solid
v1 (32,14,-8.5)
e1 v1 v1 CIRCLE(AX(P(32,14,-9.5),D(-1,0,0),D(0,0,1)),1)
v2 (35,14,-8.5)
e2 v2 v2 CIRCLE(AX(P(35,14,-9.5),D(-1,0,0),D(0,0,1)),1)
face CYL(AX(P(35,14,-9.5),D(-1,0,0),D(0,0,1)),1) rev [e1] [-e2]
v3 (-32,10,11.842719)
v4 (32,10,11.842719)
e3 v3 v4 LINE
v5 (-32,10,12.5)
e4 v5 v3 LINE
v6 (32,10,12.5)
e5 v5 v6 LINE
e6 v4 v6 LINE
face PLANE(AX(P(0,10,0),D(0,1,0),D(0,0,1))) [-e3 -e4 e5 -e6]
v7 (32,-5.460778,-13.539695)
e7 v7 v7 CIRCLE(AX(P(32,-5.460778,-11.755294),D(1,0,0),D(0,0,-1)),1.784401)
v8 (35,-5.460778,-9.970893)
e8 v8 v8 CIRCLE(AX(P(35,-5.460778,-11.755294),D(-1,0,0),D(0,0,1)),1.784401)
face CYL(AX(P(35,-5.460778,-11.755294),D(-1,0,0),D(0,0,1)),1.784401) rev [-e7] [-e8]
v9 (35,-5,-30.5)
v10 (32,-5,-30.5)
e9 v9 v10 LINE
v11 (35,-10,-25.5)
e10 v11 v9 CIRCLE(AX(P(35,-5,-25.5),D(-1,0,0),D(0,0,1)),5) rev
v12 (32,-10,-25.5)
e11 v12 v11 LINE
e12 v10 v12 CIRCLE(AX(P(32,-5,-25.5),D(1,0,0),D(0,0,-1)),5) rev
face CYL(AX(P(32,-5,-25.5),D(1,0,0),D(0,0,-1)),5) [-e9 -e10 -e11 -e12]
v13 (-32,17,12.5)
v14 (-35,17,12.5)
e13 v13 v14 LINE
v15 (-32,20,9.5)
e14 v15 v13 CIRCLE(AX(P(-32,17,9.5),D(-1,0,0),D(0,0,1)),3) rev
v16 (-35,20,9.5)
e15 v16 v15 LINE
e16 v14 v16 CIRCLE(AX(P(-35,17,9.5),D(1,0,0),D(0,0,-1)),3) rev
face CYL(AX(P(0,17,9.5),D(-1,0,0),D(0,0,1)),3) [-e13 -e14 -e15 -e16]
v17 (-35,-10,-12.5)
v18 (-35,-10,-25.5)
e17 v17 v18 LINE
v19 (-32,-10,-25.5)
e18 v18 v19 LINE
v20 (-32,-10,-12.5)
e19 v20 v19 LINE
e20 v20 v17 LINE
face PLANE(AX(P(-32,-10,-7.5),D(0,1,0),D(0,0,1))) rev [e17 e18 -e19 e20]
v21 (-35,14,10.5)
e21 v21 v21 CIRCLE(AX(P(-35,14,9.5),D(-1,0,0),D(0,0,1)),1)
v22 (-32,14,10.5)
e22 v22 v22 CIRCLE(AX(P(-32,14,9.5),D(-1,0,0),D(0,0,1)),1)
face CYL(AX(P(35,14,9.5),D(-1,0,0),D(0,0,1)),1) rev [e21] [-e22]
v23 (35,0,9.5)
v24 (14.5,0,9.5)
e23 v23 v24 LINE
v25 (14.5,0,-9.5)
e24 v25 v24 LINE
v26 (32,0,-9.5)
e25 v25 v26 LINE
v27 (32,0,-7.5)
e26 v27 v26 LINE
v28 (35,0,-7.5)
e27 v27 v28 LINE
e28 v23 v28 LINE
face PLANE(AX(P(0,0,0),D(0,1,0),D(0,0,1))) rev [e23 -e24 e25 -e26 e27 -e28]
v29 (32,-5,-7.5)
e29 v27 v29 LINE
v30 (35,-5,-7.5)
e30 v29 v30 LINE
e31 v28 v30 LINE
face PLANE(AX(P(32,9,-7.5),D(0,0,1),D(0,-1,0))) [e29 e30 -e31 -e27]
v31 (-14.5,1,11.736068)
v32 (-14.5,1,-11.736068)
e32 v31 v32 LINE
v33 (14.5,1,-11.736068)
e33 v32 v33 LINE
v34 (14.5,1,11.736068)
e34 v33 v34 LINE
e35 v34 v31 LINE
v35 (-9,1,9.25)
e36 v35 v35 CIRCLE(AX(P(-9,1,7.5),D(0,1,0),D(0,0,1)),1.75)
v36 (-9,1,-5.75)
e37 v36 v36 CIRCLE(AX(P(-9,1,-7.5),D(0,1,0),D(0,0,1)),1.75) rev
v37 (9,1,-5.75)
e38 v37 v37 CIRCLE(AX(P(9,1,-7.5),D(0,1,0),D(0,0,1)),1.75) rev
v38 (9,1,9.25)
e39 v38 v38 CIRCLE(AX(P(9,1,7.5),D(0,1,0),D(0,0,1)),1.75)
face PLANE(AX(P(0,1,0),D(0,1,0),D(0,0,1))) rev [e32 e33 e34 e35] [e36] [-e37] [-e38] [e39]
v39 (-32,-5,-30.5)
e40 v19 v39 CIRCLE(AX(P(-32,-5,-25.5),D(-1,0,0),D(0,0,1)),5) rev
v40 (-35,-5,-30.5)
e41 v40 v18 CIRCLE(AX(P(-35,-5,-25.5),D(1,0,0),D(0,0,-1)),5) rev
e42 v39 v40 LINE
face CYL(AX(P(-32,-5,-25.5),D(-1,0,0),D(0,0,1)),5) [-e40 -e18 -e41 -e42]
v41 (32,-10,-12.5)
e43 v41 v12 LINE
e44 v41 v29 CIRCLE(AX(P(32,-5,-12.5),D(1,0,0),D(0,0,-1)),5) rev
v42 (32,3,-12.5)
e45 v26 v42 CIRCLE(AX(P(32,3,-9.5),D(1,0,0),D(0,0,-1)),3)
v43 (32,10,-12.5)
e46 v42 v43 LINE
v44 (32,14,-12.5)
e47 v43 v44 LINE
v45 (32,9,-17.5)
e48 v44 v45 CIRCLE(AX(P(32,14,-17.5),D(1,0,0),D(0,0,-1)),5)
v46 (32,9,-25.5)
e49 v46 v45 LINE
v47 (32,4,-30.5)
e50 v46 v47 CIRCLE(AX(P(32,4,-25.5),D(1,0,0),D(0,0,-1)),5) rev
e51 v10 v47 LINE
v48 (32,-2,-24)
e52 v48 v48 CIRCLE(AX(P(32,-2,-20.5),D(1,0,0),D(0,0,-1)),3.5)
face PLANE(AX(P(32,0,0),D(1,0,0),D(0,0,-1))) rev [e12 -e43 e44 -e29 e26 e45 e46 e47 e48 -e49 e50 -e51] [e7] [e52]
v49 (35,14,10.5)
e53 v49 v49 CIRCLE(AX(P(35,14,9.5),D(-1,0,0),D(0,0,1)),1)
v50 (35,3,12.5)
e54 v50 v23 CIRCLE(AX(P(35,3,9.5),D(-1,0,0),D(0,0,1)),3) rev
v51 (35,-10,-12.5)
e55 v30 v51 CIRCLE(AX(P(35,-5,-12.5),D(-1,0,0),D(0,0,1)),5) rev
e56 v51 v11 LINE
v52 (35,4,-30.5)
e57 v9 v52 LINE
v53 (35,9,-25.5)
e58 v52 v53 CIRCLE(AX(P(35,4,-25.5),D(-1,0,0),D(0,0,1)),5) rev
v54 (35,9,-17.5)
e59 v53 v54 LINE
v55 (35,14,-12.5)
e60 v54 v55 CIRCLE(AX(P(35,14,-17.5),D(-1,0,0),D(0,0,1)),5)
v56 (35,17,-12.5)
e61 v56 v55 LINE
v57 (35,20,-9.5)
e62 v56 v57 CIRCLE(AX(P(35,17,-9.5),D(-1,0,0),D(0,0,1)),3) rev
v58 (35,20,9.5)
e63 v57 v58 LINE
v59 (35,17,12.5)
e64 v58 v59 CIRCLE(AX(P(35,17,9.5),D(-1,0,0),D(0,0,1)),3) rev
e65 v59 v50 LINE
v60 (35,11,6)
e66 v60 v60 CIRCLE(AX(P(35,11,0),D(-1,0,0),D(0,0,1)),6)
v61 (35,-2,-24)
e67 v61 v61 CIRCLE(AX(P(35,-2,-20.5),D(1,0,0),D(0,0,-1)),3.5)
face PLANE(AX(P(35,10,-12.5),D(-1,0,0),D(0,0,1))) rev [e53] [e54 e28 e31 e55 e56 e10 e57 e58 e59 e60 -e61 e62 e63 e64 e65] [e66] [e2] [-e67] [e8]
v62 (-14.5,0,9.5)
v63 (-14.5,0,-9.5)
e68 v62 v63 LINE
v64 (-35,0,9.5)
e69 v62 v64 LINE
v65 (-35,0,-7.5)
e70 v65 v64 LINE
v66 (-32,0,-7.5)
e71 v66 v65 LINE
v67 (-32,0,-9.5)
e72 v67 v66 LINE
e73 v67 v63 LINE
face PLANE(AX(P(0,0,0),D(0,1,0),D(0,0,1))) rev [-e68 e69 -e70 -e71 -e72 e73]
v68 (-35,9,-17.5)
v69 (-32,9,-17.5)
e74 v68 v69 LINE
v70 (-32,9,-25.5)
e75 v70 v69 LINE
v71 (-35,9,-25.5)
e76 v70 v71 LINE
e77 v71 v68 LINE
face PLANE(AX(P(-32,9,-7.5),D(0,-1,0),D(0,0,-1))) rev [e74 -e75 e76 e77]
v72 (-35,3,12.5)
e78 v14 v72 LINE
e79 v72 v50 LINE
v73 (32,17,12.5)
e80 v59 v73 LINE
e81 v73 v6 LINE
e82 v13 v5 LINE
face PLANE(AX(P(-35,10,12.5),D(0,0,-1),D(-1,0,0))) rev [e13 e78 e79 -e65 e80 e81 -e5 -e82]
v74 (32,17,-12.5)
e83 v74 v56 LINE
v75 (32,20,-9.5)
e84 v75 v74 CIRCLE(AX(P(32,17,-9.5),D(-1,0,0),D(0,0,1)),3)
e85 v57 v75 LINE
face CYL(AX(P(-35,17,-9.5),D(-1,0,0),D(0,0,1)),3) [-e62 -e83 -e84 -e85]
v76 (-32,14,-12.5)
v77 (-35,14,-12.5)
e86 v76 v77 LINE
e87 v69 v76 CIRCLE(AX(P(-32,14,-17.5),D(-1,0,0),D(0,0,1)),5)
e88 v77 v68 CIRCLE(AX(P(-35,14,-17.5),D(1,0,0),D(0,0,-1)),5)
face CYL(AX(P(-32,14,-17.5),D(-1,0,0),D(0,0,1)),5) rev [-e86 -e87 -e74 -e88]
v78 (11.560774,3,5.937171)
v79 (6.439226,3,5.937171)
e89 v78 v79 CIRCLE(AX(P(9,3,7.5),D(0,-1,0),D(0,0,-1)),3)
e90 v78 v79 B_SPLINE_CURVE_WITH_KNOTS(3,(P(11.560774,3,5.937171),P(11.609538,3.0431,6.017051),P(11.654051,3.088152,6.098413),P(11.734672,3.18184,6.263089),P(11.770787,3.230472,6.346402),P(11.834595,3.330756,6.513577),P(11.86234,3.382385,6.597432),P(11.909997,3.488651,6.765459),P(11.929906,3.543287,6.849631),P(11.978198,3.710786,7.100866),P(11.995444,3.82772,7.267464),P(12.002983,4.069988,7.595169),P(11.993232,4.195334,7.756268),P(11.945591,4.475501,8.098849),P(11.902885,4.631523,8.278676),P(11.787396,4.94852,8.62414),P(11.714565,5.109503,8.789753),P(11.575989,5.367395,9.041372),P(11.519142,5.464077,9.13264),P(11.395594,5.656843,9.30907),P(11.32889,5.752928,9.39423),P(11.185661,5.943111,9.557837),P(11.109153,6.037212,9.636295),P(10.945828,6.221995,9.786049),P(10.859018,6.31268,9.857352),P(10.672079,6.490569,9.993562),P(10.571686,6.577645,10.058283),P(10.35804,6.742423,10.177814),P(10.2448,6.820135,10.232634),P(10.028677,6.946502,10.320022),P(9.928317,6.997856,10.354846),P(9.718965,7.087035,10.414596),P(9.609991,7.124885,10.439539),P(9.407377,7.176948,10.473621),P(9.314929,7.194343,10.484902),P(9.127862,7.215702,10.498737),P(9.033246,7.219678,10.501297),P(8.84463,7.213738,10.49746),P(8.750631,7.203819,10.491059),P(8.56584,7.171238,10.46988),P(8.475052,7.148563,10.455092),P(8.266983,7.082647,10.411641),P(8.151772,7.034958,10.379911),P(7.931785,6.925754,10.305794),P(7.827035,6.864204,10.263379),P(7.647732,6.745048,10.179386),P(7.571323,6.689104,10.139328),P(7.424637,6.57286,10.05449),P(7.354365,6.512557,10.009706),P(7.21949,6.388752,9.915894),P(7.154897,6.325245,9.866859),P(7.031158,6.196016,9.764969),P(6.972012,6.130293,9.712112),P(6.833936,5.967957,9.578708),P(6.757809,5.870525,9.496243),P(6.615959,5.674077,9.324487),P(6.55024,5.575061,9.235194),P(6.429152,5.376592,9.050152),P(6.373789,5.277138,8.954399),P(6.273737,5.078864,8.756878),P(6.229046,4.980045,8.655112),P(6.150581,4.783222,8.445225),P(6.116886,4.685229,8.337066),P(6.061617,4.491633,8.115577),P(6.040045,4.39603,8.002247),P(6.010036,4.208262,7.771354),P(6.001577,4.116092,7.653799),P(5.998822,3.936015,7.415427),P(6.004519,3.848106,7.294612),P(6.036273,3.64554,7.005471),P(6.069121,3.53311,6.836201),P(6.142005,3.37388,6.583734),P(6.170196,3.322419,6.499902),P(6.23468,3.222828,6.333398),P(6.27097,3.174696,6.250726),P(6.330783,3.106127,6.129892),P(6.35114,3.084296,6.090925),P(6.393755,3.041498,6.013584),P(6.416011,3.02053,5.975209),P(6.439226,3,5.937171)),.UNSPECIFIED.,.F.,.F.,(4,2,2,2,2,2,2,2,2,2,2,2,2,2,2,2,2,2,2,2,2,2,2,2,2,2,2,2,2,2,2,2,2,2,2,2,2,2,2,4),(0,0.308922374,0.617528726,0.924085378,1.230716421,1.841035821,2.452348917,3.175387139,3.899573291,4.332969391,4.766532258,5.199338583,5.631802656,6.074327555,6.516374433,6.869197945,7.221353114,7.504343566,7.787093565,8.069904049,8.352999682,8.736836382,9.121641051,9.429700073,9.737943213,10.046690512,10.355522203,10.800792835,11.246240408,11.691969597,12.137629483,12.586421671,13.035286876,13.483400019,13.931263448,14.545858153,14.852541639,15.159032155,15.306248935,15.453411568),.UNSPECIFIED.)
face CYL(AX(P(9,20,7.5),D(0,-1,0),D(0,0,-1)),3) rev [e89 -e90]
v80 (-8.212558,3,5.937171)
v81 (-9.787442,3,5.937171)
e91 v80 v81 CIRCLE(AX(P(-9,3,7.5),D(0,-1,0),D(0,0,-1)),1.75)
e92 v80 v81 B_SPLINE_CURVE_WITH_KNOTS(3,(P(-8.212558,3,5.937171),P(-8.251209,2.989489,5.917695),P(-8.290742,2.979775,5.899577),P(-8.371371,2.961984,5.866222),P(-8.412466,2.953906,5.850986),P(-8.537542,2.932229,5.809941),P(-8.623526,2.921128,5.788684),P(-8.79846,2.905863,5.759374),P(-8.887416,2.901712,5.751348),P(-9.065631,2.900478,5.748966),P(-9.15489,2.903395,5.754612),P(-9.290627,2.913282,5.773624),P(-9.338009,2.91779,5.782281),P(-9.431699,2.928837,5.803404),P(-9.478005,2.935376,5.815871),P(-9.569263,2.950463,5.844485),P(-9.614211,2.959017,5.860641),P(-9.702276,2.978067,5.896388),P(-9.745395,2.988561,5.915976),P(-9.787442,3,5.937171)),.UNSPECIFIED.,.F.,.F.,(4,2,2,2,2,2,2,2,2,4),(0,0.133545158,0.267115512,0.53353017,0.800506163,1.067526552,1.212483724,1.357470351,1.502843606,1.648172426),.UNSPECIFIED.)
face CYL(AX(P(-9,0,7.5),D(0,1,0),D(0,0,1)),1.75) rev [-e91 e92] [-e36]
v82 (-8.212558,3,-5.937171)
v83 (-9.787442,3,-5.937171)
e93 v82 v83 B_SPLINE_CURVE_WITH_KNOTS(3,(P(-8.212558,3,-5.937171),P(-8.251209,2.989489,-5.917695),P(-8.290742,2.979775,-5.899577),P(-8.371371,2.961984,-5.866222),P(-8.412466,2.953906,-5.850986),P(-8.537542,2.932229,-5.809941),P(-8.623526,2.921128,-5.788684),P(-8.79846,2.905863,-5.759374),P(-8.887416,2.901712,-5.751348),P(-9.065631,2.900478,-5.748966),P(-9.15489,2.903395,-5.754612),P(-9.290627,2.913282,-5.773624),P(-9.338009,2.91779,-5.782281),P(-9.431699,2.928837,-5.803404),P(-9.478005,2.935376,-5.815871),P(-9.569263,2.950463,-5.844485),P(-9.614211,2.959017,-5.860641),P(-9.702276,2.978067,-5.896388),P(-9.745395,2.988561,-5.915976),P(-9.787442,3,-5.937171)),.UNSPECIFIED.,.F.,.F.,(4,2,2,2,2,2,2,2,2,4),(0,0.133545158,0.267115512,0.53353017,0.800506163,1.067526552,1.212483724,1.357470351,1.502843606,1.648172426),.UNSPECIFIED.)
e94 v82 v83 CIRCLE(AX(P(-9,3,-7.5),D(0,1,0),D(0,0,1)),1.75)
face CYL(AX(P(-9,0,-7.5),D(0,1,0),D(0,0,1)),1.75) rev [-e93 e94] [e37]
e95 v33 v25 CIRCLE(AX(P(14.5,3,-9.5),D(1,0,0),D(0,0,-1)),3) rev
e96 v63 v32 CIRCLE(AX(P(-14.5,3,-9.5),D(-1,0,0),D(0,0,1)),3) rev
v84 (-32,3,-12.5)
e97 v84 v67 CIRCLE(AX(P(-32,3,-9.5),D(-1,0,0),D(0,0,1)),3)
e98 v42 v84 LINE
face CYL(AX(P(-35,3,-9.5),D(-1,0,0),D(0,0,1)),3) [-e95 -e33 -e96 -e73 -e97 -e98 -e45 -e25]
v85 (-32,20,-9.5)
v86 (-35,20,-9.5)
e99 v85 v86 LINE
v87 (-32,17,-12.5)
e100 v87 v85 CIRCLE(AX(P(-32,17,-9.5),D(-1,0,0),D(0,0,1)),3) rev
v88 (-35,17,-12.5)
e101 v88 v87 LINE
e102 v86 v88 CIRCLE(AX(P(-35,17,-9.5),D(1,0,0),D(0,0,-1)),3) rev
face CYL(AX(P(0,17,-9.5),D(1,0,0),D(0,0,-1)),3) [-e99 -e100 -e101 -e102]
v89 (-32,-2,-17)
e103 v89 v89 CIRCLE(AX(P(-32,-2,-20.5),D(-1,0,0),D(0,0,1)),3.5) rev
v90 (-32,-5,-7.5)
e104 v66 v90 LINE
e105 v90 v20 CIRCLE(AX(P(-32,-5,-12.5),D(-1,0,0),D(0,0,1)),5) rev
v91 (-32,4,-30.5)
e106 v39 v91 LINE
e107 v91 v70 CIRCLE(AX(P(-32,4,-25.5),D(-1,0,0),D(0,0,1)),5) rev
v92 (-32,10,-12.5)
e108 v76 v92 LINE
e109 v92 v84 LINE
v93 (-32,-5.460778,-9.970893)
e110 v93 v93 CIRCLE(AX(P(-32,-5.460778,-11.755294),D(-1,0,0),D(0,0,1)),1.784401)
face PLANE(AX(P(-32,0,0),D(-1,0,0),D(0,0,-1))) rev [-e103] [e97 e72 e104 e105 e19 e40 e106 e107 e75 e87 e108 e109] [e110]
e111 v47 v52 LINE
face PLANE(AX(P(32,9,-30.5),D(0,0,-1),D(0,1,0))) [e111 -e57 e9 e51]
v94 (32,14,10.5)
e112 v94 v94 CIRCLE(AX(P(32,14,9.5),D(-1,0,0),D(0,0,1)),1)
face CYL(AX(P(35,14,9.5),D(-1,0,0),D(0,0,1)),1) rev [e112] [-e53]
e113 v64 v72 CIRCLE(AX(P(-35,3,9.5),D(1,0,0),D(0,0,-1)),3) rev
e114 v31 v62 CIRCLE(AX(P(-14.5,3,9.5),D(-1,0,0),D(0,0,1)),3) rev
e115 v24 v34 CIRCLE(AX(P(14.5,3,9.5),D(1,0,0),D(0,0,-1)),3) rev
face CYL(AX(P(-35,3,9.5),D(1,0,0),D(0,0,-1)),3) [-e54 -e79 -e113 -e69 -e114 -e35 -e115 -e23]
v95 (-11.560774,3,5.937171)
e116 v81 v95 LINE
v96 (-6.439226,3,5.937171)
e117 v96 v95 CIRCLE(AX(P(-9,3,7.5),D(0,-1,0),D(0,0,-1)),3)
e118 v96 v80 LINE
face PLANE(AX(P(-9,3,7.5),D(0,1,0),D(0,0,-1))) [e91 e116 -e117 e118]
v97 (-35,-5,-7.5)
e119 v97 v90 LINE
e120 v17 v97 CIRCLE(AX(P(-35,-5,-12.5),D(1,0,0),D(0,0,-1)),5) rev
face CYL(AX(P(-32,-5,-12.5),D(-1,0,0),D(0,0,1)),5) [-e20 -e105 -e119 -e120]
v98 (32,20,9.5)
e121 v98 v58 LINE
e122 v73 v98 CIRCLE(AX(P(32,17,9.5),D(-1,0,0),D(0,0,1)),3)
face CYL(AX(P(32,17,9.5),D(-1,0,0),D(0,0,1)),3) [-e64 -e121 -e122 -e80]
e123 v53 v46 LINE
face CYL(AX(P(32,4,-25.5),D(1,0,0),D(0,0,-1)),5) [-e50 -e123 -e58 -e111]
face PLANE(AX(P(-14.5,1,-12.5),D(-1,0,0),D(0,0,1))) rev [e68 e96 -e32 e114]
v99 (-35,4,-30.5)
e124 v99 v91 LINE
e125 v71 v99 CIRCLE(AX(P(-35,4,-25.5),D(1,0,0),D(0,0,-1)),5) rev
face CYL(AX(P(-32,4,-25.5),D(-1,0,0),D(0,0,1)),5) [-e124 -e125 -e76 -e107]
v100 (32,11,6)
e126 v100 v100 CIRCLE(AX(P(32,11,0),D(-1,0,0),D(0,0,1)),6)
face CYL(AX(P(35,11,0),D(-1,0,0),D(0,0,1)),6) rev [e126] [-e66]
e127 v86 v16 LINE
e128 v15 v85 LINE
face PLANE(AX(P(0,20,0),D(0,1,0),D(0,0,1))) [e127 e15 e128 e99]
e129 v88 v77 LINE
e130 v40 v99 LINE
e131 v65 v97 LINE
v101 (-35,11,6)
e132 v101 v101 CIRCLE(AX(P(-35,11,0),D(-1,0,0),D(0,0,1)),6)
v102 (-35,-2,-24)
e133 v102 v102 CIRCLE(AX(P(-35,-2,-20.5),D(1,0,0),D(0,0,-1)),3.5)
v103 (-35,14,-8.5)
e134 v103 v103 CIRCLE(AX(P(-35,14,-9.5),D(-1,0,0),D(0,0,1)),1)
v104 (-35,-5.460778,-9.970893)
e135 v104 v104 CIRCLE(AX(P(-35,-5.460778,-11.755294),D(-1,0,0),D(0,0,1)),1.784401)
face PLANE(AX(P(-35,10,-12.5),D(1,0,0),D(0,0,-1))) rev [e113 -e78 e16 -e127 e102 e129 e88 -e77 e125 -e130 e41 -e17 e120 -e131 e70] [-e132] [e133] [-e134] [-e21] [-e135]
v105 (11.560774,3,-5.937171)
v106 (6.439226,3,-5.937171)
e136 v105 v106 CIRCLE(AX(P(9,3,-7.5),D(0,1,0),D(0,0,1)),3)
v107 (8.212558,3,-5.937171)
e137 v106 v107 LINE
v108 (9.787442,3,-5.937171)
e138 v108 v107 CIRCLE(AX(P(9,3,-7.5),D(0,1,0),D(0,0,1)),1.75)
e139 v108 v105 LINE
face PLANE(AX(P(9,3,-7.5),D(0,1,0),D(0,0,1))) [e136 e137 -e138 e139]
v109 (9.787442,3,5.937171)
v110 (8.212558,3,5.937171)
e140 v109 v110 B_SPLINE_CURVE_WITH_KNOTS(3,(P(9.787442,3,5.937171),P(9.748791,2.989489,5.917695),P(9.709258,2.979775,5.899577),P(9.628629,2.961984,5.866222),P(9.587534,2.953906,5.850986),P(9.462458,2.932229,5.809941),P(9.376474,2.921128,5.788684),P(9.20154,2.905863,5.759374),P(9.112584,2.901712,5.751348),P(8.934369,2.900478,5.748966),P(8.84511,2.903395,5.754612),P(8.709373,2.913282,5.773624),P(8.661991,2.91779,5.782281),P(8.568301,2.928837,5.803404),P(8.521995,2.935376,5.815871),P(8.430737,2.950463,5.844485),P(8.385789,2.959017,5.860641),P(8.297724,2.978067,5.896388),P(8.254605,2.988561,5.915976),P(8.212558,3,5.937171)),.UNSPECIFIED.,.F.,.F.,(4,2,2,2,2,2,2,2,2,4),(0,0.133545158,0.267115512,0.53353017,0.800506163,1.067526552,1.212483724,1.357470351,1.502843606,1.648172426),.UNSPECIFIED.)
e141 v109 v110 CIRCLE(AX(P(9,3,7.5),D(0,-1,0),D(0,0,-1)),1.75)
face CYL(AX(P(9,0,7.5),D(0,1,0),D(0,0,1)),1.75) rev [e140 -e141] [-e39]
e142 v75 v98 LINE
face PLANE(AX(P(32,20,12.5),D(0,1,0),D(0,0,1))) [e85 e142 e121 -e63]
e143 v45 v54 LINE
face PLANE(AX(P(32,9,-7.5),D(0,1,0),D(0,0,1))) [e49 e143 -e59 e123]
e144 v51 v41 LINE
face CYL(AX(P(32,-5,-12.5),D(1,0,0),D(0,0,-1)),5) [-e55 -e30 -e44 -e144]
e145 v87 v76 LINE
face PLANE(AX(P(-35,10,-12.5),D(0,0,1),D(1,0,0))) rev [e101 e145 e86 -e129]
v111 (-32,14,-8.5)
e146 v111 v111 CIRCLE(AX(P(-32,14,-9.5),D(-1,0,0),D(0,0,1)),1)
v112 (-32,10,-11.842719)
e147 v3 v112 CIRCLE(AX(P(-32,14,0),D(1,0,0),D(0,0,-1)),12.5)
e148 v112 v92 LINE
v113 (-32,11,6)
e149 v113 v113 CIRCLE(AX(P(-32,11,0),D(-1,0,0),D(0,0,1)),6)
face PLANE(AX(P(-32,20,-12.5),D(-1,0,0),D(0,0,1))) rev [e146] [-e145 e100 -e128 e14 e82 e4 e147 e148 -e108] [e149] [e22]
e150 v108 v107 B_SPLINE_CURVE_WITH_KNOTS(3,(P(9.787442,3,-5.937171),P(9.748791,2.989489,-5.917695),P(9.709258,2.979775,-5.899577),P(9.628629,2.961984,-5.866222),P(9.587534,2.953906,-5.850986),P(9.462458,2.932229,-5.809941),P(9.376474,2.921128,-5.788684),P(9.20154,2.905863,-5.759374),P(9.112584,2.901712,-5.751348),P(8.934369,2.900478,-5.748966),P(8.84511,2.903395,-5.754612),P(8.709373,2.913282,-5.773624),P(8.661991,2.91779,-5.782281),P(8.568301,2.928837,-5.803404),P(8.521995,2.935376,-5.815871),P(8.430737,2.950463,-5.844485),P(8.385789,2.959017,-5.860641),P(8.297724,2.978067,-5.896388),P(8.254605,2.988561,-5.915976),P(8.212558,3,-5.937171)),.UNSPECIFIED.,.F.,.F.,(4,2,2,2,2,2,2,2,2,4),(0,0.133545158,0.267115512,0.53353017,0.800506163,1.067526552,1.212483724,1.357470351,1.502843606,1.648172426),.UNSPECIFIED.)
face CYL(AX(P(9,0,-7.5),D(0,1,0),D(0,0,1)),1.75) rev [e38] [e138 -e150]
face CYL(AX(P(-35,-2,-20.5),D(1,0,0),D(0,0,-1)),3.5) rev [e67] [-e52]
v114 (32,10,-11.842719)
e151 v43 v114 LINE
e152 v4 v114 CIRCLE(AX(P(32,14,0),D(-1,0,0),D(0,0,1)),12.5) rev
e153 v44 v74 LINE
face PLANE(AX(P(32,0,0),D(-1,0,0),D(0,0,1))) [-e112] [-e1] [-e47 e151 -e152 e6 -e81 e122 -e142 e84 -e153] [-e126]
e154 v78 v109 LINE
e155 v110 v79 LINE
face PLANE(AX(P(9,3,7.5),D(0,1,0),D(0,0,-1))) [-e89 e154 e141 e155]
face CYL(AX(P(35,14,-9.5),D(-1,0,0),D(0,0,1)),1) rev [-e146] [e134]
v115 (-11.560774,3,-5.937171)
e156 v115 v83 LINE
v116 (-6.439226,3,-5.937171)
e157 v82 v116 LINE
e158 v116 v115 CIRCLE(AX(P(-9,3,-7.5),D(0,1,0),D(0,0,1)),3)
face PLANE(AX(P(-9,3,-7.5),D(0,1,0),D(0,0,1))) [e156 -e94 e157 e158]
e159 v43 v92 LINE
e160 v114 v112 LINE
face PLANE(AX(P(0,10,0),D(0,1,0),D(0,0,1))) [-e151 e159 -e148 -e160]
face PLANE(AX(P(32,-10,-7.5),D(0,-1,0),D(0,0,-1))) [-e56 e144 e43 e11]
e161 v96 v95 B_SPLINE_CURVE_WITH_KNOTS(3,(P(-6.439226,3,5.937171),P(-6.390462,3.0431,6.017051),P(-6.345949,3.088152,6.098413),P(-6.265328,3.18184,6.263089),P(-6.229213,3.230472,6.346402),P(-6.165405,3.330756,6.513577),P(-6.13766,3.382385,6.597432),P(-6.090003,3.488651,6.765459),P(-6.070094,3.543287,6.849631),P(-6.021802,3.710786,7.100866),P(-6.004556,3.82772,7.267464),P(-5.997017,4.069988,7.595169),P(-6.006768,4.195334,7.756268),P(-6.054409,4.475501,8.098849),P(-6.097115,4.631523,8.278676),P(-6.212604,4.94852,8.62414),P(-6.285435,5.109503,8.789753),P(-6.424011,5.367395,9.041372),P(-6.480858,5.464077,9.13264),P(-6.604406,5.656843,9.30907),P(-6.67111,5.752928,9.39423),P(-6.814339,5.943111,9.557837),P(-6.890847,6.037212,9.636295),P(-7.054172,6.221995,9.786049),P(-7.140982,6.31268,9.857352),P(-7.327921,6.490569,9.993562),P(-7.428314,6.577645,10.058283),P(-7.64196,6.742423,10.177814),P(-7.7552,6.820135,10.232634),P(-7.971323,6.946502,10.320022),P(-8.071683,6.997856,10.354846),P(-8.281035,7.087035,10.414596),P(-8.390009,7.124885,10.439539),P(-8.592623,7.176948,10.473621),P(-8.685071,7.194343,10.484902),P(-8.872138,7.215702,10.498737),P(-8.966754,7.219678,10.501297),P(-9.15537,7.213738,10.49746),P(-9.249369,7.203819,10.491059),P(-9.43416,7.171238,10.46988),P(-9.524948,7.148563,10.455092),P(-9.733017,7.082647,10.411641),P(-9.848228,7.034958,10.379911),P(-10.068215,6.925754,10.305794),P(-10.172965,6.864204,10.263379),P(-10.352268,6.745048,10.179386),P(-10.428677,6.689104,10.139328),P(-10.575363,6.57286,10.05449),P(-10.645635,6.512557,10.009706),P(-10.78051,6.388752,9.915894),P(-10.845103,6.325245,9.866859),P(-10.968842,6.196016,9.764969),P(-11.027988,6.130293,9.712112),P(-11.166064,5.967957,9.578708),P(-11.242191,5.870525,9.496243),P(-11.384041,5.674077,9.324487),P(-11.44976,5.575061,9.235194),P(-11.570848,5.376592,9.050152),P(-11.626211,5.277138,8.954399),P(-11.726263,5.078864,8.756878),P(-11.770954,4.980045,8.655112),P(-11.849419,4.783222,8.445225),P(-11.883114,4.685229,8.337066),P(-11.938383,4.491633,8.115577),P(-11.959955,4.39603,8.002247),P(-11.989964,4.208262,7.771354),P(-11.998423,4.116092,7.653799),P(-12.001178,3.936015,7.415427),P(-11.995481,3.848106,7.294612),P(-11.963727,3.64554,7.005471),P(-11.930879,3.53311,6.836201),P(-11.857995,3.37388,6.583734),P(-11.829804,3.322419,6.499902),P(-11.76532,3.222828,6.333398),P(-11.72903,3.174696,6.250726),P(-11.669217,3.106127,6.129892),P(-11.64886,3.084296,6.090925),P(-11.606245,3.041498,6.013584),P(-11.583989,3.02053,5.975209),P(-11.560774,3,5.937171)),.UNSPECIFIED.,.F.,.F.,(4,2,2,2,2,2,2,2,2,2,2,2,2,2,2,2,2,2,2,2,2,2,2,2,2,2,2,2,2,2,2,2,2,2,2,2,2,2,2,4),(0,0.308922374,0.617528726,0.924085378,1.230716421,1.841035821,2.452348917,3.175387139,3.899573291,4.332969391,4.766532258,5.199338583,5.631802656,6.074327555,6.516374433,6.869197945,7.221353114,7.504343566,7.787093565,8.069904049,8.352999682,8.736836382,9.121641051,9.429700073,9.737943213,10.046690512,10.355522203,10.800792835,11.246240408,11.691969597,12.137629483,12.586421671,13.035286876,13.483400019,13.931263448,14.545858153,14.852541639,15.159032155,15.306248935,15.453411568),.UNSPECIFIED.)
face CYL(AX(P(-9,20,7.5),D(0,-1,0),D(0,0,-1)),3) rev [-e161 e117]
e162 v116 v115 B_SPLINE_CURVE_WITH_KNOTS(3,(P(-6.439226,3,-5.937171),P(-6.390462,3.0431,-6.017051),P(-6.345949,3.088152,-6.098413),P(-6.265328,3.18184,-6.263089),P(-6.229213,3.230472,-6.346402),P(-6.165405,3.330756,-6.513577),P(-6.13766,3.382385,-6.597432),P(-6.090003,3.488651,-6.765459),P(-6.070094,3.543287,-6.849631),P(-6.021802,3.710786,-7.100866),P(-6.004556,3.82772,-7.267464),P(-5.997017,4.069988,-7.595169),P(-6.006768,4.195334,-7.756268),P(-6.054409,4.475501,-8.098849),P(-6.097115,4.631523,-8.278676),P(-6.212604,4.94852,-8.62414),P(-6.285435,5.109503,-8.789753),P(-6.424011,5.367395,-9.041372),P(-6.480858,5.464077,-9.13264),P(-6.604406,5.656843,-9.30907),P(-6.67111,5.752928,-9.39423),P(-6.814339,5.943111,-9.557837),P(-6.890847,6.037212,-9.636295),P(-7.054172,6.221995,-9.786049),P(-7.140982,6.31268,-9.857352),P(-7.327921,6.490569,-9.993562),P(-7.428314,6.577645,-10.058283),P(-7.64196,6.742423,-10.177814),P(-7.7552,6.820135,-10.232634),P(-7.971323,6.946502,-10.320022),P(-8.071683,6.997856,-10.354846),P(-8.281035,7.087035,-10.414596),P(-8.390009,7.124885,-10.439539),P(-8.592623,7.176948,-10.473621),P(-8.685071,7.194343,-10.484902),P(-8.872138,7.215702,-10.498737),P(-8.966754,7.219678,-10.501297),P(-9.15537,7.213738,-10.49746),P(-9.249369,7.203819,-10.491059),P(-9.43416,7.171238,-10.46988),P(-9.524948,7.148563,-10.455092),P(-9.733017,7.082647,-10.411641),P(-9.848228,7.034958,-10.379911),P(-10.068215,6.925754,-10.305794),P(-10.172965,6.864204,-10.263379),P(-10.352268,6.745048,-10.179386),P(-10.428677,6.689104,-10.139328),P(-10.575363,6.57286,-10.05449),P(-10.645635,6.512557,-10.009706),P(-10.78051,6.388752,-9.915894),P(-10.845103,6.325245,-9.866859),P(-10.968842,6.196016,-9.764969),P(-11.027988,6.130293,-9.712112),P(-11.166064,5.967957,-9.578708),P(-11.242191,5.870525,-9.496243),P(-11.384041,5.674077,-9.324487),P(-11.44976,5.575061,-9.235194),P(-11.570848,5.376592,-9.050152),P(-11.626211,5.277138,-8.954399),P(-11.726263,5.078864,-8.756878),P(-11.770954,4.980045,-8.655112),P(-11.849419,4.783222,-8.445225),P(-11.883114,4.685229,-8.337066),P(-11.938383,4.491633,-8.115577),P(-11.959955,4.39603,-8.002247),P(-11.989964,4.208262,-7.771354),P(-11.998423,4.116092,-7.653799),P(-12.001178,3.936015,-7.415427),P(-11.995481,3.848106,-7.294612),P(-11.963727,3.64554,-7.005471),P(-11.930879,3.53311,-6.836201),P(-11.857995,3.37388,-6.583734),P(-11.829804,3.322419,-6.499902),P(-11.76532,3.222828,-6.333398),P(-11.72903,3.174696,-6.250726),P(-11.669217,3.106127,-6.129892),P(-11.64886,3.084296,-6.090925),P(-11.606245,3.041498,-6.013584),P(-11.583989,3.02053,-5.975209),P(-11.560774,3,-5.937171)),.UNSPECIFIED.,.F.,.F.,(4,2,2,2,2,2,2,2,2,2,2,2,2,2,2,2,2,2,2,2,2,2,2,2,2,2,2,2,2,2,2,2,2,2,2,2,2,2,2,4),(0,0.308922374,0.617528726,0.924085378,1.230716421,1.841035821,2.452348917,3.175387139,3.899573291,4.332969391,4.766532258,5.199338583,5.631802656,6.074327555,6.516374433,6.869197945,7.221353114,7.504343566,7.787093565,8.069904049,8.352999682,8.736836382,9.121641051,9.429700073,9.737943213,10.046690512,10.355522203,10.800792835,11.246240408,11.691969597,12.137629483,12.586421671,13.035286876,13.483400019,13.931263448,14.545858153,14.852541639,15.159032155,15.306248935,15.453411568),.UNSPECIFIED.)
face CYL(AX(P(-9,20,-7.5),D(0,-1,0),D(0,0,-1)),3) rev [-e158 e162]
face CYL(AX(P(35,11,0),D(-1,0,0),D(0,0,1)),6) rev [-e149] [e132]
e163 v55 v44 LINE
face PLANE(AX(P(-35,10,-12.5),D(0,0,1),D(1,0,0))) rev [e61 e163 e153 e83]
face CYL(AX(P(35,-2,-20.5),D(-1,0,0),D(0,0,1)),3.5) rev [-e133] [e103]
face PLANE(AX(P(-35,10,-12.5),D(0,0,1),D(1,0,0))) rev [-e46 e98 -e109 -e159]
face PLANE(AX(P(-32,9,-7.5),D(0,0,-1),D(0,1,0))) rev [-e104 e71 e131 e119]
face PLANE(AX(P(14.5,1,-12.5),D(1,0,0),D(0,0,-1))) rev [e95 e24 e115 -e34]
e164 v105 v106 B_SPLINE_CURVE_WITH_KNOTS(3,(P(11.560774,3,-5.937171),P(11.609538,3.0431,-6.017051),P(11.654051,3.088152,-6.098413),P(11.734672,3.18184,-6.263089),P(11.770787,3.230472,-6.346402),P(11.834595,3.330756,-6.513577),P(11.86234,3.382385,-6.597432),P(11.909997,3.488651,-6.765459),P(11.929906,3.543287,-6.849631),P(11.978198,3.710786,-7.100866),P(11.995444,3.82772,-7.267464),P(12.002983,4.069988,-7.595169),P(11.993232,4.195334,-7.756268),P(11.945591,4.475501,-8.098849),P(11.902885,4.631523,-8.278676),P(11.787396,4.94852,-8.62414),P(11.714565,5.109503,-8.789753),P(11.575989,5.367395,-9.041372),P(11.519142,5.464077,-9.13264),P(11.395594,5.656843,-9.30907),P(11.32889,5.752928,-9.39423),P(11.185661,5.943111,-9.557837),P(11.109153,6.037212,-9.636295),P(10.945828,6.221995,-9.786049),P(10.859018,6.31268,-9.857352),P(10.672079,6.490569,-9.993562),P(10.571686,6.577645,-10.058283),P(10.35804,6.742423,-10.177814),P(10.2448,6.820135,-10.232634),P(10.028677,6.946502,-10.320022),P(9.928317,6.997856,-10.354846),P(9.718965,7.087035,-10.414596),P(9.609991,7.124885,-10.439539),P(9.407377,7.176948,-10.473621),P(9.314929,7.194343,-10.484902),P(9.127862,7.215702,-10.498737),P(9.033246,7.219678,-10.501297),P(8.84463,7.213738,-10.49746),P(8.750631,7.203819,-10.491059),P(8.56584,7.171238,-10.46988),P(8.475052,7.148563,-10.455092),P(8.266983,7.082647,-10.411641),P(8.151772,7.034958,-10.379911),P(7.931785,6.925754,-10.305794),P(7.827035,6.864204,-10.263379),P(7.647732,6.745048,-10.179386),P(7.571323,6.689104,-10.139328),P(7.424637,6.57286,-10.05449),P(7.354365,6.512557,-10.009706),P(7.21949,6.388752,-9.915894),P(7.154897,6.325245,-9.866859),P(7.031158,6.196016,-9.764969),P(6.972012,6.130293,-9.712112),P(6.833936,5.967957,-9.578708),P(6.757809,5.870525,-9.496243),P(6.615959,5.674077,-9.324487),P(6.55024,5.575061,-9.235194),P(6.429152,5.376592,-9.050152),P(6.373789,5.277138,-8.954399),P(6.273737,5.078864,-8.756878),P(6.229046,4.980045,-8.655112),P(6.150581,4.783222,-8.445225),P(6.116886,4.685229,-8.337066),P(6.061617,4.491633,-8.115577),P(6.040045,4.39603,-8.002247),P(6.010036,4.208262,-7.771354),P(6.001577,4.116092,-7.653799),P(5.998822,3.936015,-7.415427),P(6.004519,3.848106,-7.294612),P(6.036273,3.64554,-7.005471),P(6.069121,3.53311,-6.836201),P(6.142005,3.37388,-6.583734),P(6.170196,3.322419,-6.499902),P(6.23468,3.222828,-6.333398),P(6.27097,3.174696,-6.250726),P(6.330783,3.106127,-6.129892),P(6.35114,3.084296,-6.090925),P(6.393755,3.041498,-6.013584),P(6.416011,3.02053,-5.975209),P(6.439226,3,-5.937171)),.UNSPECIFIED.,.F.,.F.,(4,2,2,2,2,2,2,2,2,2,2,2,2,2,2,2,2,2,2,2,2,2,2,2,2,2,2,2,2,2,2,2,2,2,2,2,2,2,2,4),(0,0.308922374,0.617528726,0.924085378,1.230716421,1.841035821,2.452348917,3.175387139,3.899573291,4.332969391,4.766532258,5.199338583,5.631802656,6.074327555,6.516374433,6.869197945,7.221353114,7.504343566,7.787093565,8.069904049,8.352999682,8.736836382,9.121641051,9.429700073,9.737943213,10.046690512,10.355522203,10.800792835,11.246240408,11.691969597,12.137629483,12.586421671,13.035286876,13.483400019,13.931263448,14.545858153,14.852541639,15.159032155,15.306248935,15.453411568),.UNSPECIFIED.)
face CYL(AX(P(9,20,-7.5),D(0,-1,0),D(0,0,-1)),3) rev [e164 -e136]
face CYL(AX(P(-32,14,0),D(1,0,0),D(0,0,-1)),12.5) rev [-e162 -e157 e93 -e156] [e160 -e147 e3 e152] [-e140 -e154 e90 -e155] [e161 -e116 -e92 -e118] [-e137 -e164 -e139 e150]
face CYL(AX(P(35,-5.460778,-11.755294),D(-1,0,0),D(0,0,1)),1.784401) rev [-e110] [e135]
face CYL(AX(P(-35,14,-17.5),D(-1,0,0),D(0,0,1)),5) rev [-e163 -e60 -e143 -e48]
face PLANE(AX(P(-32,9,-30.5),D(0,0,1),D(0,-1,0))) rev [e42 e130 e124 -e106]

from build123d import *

# Parameters (mm, degrees)
SKETCH1_W            = 70
SKETCH1_H            = 25
BOSS_EXTRUDE1_DEPTH  = 10
SKETCH2_W            = 3
SKETCH2_H            = 25
BOSS_EXTRUDE2_DEPTH  = 10
SKETCH3_R            = 12.5
CUT_EXTRUDE1_DEPTH   = 67
SKETCH4_R            = 3
CUT_EXTRUDE2_DEPTH   = 41.868692174
SKETCH5_R            = 1.75
CUT_EXTRUDE3_DEPTH   = 41.868692259
SKETCH6_W            = 29
SKETCH6_H            = 13
CUT_EXTRUDE4_DEPTH   = 1
SKETCH9_W            = 25
SKETCH9_H            = 20
BOSS_EXTRUDE3_DEPTH  = 3
SKETCH8_R            = 6
SKETCH8_R_2          = 1
CUT_EXTRUDE6_DEPTH   = 74.866433513
FILLET1_R            = 3
SKETCH10_W           = 23
SKETCH10_H           = 19
BOSS_EXTRUDE4_DEPTH  = 3
FILLET2_R            = 5
SKETCH11_R           = 3.5
CUT_EXTRUDE7_DEPTH   = 79.931932702
FILLET2_OF_MIRROR2_R = 5
FILLET3_R            = 5
FILLET4_R            = 3
SKETCH12_R           = 1.784400781
CUT_EXTRUDE8_DEPTH   = 79.931932702


# Some blends are built 0.0001 mm under size
with BuildPart() as part:
    # Sketch1 → Boss-Extrude1 (new body)
    with BuildSketch(Plane(origin=(0, 0, 0), x_dir=(1, 0, 0), z_dir=(0, 1, 0))):
        Rectangle(SKETCH1_W, SKETCH1_H)
    extrude(amount=BOSS_EXTRUDE1_DEPTH)

    # Sketch2 → Boss-Extrude2 (add)
    with BuildSketch(Plane(origin=(0, 10, 0), x_dir=(1, 0, 0), z_dir=(0, 1, 0))):
        with Locations((-33.5, 0)):
            Rectangle(SKETCH2_W, SKETCH2_H)
    extrude(amount=BOSS_EXTRUDE2_DEPTH)

    # Sketch3 → Cut-Extrude1 (cut)
    with BuildSketch(Plane(origin=(35, 0, 0), x_dir=(0, 0, -1), z_dir=(1, 0, 0))):
        with Locations((0, 14)):
            Circle(SKETCH3_R)
    extrude(amount=-CUT_EXTRUDE1_DEPTH, mode=Mode.SUBTRACT)

    # Sketch4 → Cut-Extrude2 (cut, through all)
    with BuildSketch(Plane(origin=(0, 3, 0), x_dir=(1, 0, 0), z_dir=(0, 1, 0))):
        with Locations((-9, 7.5)):
            Circle(SKETCH4_R)
        with Locations((9, 7.5)):
            Circle(SKETCH4_R)
    cut_extrude2 = extrude(amount=CUT_EXTRUDE2_DEPTH, mode=Mode.SUBTRACT)

    # Sketch5 → Cut-Extrude3 (cut, through all)
    with BuildSketch(Plane(origin=(0, 3, 0), x_dir=(1, 0, 0), z_dir=(0, 1, 0))):
        with Locations(Location((-9, 7.5, 0), (0, 0, 270))):
            Circle(SKETCH5_R)
        with Locations(Location((9, 7.5, 0), (0, 0, 270))):
            Circle(SKETCH5_R)
    cut_extrude3 = extrude(amount=-CUT_EXTRUDE3_DEPTH, mode=Mode.SUBTRACT)

    # Sketch6 → Cut-Extrude4 (cut)
    with BuildSketch(Plane.XZ):
        with Locations((0, -6)):
            Rectangle(SKETCH6_W, SKETCH6_H)
    cut_extrude4 = extrude(amount=-CUT_EXTRUDE4_DEPTH, mode=Mode.SUBTRACT)

    # Mirror1: Cut-Extrude2, Cut-Extrude3, Cut-Extrude4 across plane
    add(cut_extrude2.mirror(Plane.XY), mode=Mode.SUBTRACT)
    add(cut_extrude3.mirror(Plane.XY), mode=Mode.SUBTRACT)
    add(cut_extrude4.mirror(Plane.XY), mode=Mode.SUBTRACT)

    # Sketch9 → Boss-Extrude3 (add)
    with BuildSketch(Plane(origin=(35, 0, 0), x_dir=(0, 0, -1), z_dir=(1, 0, 0))):
        with Locations((0, 10)):
            Rectangle(SKETCH9_W, SKETCH9_H)
    extrude(amount=-BOSS_EXTRUDE3_DEPTH)

    # Sketch8 → Cut-Extrude6 (cut, through all)
    with BuildSketch(Plane.ZY.offset(35)):
        with Locations((0, 11)):
            Circle(SKETCH8_R)
        with Locations((-9.5, 14)):
            Circle(SKETCH8_R_2)
        with Locations((9.5, 14)):
            Circle(SKETCH8_R_2)
    extrude(amount=-CUT_EXTRUDE6_DEPTH, mode=Mode.SUBTRACT)

    # Fillet1
    fillet1_edges = [part.edges().sort_by_distance(p)[0] for p in [
        (33.5, 20, 12.5),
        (33.5, 20, -12.5),
        (-33.5, 20, 12.5),
        (-33.5, 20, -12.5),
    ]]
    fillet(fillet1_edges, radius=FILLET1_R)

    # Sketch10 → Boss-Extrude4 (add)
    with BuildSketch(Plane(origin=(35, 0, 0), x_dir=(0, 0, -1), z_dir=(1, 0, 0))):
        with Locations((19, -0.5)):
            Rectangle(SKETCH10_W, SKETCH10_H)
    boss_extrude4 = extrude(amount=-BOSS_EXTRUDE4_DEPTH)

    # Fillet2
    fillet2_edges = [part.edges().sort_by_distance(p)[0] for p in [
        (33.5, -10, -7.5),
        (33.5, 9, -30.5),
        (33.5, -10, -30.5),
    ]]
    fillet(fillet2_edges, radius=FILLET2_R)

    # Sketch11 → Cut-Extrude7 (cut, through all)
    with BuildSketch(Plane(origin=(35, 0, 0), x_dir=(0, 0, -1), z_dir=(1, 0, 0))):
        with Locations((20.5, -2)):
            Circle(SKETCH11_R)
    cut_extrude7 = extrude(amount=-CUT_EXTRUDE7_DEPTH, mode=Mode.SUBTRACT)

    # Mirror2: Boss-Extrude4, Cut-Extrude7 across plane
    add(boss_extrude4.mirror(Plane(origin=(0, 0, 0), x_dir=(0, 0, 1), z_dir=(1, 0, 0))))
    add(cut_extrude7.mirror(Plane(origin=(0, 0, 0), x_dir=(0, 0, 1), z_dir=(1, 0, 0))), mode=Mode.SUBTRACT)

    # Fillet2 of Mirror2
    fillet2_of_mirror2_edges = [part.edges().sort_by_distance(p)[0] for p in [
        (-33.5, -10, -7.5),
        (-33.5, 9, -30.5),
        (-33.5, -10, -30.5),
    ]]
    fillet(fillet2_of_mirror2_edges, radius=FILLET2_OF_MIRROR2_R)

    # Fillet3
    # the kernel refuses this fillet: 5 mm, written as the material it adds along each edge
    with BuildSketch(Plane(origin=(35, 9, -12.5), x_dir=(0, 1, 0), z_dir=(-1, 0, 0)), Plane(origin=(-35, 9, -12.5), x_dir=(0, 0, -1), z_dir=(1, 0, 0))) as fillet3_piece_1:
        with BuildLine():
            CenterArc((FILLET3_R, FILLET3_R), FILLET3_R, 180, 90)
            Line((0, FILLET3_R), (0, 0))
            Line((0, 0), (FILLET3_R, 0))
        make_face()
    extrude(amount=3)

    # Fillet4
    fillet4_edges = [part.edges().sort_by_distance(p)[0] for p in [
        (24.75, 0, 12.5),
        (-23.25, 0, -12.5),
    ]]
    fillet(fillet4_edges, radius=FILLET4_R - 0.0001)  # a hair under: the kernel refuses the full size

    # Sketch12 → Cut-Extrude8 (cut, through all)
    with BuildSketch(Plane.ZY.offset(35)):
        with Locations((-11.755294266, -5.460778231)):
            Circle(SKETCH12_R)
    extrude(amount=-CUT_EXTRUDE8_DEPTH, mode=Mode.SUBTRACT)


solid = part.part
